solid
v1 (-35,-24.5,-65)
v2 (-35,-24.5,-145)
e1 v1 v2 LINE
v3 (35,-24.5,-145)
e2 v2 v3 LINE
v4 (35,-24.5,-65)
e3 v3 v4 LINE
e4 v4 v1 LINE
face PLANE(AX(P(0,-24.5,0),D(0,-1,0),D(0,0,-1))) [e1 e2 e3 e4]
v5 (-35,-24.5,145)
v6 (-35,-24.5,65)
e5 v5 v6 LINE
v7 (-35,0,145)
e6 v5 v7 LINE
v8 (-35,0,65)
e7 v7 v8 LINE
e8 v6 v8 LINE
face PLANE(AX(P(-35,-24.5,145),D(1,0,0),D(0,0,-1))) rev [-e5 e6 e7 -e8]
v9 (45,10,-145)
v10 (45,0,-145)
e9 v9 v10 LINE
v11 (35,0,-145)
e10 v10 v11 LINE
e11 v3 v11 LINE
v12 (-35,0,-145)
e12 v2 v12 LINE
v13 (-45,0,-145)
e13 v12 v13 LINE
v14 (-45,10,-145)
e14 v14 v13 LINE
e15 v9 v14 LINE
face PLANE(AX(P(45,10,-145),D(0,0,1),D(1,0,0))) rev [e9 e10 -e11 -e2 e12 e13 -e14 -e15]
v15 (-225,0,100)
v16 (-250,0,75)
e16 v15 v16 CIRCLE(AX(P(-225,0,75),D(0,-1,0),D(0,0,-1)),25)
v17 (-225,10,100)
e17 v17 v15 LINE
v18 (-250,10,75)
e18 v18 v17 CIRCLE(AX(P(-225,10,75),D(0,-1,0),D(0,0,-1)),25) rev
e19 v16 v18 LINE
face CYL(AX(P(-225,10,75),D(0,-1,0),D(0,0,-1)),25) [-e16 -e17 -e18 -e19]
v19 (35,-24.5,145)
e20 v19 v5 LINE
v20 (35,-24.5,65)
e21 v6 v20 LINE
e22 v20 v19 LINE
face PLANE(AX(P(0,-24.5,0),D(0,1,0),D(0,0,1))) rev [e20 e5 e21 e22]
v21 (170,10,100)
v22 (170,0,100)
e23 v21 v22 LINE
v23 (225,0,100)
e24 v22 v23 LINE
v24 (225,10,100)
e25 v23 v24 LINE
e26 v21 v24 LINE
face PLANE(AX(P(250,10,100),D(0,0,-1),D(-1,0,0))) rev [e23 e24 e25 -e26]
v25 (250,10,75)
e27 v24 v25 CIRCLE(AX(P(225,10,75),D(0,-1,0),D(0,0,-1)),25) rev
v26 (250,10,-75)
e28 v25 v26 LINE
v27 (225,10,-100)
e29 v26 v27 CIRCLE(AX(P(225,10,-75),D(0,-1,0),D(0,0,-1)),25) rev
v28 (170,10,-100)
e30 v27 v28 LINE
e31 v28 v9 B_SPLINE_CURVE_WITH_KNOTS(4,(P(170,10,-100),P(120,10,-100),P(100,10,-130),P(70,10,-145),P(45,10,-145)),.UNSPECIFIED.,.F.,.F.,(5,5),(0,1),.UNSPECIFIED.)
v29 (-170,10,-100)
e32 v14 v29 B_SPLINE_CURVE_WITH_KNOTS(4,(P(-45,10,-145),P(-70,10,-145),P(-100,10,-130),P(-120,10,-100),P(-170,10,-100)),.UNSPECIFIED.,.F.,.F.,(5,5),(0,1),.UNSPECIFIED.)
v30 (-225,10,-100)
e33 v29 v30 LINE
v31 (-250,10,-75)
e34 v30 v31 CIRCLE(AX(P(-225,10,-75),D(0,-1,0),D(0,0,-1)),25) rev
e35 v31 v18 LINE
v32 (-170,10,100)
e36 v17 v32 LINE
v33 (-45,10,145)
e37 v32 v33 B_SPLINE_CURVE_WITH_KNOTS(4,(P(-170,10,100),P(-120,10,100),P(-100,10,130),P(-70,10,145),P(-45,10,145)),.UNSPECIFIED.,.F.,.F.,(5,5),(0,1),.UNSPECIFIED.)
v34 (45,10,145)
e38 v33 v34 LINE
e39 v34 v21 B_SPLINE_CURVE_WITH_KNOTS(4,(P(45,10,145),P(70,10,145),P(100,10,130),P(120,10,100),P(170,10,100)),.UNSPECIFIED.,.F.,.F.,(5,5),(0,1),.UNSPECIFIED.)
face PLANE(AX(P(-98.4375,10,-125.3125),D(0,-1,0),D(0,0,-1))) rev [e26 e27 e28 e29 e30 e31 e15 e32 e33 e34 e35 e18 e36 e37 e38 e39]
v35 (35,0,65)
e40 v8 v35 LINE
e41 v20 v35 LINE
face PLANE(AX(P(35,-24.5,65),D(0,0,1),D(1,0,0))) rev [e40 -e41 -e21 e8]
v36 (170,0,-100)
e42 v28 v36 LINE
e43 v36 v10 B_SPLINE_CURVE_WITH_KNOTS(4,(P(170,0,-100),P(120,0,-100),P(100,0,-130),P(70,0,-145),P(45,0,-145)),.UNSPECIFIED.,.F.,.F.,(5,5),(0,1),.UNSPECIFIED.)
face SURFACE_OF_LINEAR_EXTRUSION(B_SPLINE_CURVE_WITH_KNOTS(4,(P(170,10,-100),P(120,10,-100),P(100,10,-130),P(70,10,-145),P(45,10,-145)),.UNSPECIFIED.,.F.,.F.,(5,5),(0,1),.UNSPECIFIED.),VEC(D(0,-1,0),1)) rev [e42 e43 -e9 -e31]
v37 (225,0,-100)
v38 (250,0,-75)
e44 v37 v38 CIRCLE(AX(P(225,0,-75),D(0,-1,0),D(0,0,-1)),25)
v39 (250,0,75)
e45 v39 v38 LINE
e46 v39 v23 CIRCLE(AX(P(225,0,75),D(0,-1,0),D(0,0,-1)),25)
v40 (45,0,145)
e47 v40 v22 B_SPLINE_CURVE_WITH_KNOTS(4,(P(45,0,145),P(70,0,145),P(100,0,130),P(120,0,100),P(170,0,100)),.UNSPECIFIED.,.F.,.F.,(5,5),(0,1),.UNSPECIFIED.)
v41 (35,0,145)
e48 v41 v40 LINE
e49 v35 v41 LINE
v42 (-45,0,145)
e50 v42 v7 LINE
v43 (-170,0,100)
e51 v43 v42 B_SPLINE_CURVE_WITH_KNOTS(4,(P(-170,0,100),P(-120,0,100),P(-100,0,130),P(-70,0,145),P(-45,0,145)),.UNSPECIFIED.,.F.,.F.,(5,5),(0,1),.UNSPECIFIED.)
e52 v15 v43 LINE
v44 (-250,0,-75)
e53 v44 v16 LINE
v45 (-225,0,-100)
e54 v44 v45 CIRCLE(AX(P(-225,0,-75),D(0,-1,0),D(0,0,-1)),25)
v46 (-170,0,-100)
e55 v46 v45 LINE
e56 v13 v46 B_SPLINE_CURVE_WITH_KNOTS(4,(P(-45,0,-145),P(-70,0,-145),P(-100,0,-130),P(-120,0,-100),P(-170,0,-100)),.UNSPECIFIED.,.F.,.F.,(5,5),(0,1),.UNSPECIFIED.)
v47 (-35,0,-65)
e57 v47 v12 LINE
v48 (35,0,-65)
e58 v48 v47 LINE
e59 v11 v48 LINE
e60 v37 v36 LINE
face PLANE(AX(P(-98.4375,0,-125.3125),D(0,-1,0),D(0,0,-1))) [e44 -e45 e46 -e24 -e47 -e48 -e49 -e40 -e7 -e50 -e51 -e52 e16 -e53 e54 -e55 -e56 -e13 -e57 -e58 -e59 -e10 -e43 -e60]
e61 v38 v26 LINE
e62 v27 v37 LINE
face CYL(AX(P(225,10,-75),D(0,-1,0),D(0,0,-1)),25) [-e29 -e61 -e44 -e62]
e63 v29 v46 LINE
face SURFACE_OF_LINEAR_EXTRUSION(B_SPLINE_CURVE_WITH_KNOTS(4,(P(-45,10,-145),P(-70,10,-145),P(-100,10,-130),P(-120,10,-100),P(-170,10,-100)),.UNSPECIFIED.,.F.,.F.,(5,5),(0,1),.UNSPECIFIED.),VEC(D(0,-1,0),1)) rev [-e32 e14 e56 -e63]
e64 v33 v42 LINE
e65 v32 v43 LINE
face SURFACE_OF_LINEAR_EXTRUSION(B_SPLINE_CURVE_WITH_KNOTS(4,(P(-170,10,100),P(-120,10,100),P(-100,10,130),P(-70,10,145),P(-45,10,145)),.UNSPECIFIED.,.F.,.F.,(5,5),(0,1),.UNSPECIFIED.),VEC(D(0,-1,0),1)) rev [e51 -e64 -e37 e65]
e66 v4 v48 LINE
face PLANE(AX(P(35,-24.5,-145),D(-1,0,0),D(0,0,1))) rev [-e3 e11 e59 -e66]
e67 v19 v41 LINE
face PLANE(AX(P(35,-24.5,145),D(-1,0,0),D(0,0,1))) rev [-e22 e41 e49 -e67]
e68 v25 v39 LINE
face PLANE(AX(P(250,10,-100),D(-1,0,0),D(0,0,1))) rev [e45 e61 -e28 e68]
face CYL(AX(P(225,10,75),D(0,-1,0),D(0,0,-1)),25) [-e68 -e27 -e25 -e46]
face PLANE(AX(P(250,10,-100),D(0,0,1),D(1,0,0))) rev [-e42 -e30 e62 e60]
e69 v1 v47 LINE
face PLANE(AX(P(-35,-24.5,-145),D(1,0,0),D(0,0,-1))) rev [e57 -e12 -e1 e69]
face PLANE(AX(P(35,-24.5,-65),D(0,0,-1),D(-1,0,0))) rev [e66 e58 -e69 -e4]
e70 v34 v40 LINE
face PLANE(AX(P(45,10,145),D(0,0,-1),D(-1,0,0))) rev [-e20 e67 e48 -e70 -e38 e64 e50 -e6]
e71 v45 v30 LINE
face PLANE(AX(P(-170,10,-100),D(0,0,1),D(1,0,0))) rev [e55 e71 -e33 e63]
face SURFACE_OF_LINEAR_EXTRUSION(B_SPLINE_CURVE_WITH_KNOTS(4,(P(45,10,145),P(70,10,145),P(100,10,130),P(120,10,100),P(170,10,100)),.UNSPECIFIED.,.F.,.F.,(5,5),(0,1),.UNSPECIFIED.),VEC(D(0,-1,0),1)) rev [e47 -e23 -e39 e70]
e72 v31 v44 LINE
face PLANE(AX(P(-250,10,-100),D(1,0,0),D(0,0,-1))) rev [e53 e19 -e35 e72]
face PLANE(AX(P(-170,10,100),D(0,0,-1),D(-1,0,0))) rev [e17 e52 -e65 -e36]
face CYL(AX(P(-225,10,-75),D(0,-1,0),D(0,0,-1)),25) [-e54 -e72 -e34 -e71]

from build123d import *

# Parameters (mm, degrees)
BOSS_EXTRUDE1_DEPTH = 10
FILLET1_R           = 25
SKETCH3_W           = 70
SKETCH3_H           = 80
BOSS_EXTRUDE2_DEPTH = 24.5


# Read off the part's stored shape, not the designer's step: Boss-Extrude1
with BuildPart() as part:
    # Boss-Extrude1 outline → Boss-Extrude1 (new body)
    with BuildSketch(Plane(origin=(0, 0, 0), x_dir=(1, 0, 0), z_dir=(0, 1, 0))):
        with BuildLine():
            Line((-250, -100), (-170, -100))
            add(Edge.make_bspline(
                [(-170, -100), (-120, -100), (-100, -130), (-70, -145), (-45, -145)],
                knots=[0, 0, 0, 0, 0, 1, 1, 1, 1, 1], degree=4))
            Line((-45, -145), (45, -145))
            add(Edge.make_bspline(
                [(45, -145), (70, -145), (100, -130), (120, -100), (170, -100)],
                knots=[0, 0, 0, 0, 0, 1, 1, 1, 1, 1], degree=4))
            Line((170, -100), (250, -100))
            Line((250, -100), (250, 100))
            Line((250, 100), (170, 100))
            add(Edge.make_bspline(
                [(170, 100), (120, 100), (100, 130), (70, 145), (45, 145)],
                knots=[0, 0, 0, 0, 0, 1, 1, 1, 1, 1], degree=4))
            Line((45, 145), (-45, 145))
            add(Edge.make_bspline(
                [(-45, 145), (-70, 145), (-100, 130), (-120, 100), (-170, 100)],
                knots=[0, 0, 0, 0, 0, 1, 1, 1, 1, 1], degree=4))
            Line((-170, 100), (-250, 100))
            Line((-250, 100), (-250, -100))
        make_face()
    extrude(amount=BOSS_EXTRUDE1_DEPTH)

    # Fillet1
    fillet1_edges = [part.edges().sort_by_distance(p)[0] for p in [
        (-250, 5, 100),
        (-250, 5, -100),
        (250, 5, -100),
        (250, 5, 100),
    ]]
    fillet(fillet1_edges, radius=FILLET1_R)

    # Sketch3 → Boss-Extrude2 (add)
    with BuildSketch(Plane.XZ):
        with Locations((0, -105)):
            Rectangle(SKETCH3_W, SKETCH3_H)
        with Locations((0, 105)):
            Rectangle(SKETCH3_W, SKETCH3_H)
    extrude(amount=BOSS_EXTRUDE2_DEPTH)


solid = part.part
